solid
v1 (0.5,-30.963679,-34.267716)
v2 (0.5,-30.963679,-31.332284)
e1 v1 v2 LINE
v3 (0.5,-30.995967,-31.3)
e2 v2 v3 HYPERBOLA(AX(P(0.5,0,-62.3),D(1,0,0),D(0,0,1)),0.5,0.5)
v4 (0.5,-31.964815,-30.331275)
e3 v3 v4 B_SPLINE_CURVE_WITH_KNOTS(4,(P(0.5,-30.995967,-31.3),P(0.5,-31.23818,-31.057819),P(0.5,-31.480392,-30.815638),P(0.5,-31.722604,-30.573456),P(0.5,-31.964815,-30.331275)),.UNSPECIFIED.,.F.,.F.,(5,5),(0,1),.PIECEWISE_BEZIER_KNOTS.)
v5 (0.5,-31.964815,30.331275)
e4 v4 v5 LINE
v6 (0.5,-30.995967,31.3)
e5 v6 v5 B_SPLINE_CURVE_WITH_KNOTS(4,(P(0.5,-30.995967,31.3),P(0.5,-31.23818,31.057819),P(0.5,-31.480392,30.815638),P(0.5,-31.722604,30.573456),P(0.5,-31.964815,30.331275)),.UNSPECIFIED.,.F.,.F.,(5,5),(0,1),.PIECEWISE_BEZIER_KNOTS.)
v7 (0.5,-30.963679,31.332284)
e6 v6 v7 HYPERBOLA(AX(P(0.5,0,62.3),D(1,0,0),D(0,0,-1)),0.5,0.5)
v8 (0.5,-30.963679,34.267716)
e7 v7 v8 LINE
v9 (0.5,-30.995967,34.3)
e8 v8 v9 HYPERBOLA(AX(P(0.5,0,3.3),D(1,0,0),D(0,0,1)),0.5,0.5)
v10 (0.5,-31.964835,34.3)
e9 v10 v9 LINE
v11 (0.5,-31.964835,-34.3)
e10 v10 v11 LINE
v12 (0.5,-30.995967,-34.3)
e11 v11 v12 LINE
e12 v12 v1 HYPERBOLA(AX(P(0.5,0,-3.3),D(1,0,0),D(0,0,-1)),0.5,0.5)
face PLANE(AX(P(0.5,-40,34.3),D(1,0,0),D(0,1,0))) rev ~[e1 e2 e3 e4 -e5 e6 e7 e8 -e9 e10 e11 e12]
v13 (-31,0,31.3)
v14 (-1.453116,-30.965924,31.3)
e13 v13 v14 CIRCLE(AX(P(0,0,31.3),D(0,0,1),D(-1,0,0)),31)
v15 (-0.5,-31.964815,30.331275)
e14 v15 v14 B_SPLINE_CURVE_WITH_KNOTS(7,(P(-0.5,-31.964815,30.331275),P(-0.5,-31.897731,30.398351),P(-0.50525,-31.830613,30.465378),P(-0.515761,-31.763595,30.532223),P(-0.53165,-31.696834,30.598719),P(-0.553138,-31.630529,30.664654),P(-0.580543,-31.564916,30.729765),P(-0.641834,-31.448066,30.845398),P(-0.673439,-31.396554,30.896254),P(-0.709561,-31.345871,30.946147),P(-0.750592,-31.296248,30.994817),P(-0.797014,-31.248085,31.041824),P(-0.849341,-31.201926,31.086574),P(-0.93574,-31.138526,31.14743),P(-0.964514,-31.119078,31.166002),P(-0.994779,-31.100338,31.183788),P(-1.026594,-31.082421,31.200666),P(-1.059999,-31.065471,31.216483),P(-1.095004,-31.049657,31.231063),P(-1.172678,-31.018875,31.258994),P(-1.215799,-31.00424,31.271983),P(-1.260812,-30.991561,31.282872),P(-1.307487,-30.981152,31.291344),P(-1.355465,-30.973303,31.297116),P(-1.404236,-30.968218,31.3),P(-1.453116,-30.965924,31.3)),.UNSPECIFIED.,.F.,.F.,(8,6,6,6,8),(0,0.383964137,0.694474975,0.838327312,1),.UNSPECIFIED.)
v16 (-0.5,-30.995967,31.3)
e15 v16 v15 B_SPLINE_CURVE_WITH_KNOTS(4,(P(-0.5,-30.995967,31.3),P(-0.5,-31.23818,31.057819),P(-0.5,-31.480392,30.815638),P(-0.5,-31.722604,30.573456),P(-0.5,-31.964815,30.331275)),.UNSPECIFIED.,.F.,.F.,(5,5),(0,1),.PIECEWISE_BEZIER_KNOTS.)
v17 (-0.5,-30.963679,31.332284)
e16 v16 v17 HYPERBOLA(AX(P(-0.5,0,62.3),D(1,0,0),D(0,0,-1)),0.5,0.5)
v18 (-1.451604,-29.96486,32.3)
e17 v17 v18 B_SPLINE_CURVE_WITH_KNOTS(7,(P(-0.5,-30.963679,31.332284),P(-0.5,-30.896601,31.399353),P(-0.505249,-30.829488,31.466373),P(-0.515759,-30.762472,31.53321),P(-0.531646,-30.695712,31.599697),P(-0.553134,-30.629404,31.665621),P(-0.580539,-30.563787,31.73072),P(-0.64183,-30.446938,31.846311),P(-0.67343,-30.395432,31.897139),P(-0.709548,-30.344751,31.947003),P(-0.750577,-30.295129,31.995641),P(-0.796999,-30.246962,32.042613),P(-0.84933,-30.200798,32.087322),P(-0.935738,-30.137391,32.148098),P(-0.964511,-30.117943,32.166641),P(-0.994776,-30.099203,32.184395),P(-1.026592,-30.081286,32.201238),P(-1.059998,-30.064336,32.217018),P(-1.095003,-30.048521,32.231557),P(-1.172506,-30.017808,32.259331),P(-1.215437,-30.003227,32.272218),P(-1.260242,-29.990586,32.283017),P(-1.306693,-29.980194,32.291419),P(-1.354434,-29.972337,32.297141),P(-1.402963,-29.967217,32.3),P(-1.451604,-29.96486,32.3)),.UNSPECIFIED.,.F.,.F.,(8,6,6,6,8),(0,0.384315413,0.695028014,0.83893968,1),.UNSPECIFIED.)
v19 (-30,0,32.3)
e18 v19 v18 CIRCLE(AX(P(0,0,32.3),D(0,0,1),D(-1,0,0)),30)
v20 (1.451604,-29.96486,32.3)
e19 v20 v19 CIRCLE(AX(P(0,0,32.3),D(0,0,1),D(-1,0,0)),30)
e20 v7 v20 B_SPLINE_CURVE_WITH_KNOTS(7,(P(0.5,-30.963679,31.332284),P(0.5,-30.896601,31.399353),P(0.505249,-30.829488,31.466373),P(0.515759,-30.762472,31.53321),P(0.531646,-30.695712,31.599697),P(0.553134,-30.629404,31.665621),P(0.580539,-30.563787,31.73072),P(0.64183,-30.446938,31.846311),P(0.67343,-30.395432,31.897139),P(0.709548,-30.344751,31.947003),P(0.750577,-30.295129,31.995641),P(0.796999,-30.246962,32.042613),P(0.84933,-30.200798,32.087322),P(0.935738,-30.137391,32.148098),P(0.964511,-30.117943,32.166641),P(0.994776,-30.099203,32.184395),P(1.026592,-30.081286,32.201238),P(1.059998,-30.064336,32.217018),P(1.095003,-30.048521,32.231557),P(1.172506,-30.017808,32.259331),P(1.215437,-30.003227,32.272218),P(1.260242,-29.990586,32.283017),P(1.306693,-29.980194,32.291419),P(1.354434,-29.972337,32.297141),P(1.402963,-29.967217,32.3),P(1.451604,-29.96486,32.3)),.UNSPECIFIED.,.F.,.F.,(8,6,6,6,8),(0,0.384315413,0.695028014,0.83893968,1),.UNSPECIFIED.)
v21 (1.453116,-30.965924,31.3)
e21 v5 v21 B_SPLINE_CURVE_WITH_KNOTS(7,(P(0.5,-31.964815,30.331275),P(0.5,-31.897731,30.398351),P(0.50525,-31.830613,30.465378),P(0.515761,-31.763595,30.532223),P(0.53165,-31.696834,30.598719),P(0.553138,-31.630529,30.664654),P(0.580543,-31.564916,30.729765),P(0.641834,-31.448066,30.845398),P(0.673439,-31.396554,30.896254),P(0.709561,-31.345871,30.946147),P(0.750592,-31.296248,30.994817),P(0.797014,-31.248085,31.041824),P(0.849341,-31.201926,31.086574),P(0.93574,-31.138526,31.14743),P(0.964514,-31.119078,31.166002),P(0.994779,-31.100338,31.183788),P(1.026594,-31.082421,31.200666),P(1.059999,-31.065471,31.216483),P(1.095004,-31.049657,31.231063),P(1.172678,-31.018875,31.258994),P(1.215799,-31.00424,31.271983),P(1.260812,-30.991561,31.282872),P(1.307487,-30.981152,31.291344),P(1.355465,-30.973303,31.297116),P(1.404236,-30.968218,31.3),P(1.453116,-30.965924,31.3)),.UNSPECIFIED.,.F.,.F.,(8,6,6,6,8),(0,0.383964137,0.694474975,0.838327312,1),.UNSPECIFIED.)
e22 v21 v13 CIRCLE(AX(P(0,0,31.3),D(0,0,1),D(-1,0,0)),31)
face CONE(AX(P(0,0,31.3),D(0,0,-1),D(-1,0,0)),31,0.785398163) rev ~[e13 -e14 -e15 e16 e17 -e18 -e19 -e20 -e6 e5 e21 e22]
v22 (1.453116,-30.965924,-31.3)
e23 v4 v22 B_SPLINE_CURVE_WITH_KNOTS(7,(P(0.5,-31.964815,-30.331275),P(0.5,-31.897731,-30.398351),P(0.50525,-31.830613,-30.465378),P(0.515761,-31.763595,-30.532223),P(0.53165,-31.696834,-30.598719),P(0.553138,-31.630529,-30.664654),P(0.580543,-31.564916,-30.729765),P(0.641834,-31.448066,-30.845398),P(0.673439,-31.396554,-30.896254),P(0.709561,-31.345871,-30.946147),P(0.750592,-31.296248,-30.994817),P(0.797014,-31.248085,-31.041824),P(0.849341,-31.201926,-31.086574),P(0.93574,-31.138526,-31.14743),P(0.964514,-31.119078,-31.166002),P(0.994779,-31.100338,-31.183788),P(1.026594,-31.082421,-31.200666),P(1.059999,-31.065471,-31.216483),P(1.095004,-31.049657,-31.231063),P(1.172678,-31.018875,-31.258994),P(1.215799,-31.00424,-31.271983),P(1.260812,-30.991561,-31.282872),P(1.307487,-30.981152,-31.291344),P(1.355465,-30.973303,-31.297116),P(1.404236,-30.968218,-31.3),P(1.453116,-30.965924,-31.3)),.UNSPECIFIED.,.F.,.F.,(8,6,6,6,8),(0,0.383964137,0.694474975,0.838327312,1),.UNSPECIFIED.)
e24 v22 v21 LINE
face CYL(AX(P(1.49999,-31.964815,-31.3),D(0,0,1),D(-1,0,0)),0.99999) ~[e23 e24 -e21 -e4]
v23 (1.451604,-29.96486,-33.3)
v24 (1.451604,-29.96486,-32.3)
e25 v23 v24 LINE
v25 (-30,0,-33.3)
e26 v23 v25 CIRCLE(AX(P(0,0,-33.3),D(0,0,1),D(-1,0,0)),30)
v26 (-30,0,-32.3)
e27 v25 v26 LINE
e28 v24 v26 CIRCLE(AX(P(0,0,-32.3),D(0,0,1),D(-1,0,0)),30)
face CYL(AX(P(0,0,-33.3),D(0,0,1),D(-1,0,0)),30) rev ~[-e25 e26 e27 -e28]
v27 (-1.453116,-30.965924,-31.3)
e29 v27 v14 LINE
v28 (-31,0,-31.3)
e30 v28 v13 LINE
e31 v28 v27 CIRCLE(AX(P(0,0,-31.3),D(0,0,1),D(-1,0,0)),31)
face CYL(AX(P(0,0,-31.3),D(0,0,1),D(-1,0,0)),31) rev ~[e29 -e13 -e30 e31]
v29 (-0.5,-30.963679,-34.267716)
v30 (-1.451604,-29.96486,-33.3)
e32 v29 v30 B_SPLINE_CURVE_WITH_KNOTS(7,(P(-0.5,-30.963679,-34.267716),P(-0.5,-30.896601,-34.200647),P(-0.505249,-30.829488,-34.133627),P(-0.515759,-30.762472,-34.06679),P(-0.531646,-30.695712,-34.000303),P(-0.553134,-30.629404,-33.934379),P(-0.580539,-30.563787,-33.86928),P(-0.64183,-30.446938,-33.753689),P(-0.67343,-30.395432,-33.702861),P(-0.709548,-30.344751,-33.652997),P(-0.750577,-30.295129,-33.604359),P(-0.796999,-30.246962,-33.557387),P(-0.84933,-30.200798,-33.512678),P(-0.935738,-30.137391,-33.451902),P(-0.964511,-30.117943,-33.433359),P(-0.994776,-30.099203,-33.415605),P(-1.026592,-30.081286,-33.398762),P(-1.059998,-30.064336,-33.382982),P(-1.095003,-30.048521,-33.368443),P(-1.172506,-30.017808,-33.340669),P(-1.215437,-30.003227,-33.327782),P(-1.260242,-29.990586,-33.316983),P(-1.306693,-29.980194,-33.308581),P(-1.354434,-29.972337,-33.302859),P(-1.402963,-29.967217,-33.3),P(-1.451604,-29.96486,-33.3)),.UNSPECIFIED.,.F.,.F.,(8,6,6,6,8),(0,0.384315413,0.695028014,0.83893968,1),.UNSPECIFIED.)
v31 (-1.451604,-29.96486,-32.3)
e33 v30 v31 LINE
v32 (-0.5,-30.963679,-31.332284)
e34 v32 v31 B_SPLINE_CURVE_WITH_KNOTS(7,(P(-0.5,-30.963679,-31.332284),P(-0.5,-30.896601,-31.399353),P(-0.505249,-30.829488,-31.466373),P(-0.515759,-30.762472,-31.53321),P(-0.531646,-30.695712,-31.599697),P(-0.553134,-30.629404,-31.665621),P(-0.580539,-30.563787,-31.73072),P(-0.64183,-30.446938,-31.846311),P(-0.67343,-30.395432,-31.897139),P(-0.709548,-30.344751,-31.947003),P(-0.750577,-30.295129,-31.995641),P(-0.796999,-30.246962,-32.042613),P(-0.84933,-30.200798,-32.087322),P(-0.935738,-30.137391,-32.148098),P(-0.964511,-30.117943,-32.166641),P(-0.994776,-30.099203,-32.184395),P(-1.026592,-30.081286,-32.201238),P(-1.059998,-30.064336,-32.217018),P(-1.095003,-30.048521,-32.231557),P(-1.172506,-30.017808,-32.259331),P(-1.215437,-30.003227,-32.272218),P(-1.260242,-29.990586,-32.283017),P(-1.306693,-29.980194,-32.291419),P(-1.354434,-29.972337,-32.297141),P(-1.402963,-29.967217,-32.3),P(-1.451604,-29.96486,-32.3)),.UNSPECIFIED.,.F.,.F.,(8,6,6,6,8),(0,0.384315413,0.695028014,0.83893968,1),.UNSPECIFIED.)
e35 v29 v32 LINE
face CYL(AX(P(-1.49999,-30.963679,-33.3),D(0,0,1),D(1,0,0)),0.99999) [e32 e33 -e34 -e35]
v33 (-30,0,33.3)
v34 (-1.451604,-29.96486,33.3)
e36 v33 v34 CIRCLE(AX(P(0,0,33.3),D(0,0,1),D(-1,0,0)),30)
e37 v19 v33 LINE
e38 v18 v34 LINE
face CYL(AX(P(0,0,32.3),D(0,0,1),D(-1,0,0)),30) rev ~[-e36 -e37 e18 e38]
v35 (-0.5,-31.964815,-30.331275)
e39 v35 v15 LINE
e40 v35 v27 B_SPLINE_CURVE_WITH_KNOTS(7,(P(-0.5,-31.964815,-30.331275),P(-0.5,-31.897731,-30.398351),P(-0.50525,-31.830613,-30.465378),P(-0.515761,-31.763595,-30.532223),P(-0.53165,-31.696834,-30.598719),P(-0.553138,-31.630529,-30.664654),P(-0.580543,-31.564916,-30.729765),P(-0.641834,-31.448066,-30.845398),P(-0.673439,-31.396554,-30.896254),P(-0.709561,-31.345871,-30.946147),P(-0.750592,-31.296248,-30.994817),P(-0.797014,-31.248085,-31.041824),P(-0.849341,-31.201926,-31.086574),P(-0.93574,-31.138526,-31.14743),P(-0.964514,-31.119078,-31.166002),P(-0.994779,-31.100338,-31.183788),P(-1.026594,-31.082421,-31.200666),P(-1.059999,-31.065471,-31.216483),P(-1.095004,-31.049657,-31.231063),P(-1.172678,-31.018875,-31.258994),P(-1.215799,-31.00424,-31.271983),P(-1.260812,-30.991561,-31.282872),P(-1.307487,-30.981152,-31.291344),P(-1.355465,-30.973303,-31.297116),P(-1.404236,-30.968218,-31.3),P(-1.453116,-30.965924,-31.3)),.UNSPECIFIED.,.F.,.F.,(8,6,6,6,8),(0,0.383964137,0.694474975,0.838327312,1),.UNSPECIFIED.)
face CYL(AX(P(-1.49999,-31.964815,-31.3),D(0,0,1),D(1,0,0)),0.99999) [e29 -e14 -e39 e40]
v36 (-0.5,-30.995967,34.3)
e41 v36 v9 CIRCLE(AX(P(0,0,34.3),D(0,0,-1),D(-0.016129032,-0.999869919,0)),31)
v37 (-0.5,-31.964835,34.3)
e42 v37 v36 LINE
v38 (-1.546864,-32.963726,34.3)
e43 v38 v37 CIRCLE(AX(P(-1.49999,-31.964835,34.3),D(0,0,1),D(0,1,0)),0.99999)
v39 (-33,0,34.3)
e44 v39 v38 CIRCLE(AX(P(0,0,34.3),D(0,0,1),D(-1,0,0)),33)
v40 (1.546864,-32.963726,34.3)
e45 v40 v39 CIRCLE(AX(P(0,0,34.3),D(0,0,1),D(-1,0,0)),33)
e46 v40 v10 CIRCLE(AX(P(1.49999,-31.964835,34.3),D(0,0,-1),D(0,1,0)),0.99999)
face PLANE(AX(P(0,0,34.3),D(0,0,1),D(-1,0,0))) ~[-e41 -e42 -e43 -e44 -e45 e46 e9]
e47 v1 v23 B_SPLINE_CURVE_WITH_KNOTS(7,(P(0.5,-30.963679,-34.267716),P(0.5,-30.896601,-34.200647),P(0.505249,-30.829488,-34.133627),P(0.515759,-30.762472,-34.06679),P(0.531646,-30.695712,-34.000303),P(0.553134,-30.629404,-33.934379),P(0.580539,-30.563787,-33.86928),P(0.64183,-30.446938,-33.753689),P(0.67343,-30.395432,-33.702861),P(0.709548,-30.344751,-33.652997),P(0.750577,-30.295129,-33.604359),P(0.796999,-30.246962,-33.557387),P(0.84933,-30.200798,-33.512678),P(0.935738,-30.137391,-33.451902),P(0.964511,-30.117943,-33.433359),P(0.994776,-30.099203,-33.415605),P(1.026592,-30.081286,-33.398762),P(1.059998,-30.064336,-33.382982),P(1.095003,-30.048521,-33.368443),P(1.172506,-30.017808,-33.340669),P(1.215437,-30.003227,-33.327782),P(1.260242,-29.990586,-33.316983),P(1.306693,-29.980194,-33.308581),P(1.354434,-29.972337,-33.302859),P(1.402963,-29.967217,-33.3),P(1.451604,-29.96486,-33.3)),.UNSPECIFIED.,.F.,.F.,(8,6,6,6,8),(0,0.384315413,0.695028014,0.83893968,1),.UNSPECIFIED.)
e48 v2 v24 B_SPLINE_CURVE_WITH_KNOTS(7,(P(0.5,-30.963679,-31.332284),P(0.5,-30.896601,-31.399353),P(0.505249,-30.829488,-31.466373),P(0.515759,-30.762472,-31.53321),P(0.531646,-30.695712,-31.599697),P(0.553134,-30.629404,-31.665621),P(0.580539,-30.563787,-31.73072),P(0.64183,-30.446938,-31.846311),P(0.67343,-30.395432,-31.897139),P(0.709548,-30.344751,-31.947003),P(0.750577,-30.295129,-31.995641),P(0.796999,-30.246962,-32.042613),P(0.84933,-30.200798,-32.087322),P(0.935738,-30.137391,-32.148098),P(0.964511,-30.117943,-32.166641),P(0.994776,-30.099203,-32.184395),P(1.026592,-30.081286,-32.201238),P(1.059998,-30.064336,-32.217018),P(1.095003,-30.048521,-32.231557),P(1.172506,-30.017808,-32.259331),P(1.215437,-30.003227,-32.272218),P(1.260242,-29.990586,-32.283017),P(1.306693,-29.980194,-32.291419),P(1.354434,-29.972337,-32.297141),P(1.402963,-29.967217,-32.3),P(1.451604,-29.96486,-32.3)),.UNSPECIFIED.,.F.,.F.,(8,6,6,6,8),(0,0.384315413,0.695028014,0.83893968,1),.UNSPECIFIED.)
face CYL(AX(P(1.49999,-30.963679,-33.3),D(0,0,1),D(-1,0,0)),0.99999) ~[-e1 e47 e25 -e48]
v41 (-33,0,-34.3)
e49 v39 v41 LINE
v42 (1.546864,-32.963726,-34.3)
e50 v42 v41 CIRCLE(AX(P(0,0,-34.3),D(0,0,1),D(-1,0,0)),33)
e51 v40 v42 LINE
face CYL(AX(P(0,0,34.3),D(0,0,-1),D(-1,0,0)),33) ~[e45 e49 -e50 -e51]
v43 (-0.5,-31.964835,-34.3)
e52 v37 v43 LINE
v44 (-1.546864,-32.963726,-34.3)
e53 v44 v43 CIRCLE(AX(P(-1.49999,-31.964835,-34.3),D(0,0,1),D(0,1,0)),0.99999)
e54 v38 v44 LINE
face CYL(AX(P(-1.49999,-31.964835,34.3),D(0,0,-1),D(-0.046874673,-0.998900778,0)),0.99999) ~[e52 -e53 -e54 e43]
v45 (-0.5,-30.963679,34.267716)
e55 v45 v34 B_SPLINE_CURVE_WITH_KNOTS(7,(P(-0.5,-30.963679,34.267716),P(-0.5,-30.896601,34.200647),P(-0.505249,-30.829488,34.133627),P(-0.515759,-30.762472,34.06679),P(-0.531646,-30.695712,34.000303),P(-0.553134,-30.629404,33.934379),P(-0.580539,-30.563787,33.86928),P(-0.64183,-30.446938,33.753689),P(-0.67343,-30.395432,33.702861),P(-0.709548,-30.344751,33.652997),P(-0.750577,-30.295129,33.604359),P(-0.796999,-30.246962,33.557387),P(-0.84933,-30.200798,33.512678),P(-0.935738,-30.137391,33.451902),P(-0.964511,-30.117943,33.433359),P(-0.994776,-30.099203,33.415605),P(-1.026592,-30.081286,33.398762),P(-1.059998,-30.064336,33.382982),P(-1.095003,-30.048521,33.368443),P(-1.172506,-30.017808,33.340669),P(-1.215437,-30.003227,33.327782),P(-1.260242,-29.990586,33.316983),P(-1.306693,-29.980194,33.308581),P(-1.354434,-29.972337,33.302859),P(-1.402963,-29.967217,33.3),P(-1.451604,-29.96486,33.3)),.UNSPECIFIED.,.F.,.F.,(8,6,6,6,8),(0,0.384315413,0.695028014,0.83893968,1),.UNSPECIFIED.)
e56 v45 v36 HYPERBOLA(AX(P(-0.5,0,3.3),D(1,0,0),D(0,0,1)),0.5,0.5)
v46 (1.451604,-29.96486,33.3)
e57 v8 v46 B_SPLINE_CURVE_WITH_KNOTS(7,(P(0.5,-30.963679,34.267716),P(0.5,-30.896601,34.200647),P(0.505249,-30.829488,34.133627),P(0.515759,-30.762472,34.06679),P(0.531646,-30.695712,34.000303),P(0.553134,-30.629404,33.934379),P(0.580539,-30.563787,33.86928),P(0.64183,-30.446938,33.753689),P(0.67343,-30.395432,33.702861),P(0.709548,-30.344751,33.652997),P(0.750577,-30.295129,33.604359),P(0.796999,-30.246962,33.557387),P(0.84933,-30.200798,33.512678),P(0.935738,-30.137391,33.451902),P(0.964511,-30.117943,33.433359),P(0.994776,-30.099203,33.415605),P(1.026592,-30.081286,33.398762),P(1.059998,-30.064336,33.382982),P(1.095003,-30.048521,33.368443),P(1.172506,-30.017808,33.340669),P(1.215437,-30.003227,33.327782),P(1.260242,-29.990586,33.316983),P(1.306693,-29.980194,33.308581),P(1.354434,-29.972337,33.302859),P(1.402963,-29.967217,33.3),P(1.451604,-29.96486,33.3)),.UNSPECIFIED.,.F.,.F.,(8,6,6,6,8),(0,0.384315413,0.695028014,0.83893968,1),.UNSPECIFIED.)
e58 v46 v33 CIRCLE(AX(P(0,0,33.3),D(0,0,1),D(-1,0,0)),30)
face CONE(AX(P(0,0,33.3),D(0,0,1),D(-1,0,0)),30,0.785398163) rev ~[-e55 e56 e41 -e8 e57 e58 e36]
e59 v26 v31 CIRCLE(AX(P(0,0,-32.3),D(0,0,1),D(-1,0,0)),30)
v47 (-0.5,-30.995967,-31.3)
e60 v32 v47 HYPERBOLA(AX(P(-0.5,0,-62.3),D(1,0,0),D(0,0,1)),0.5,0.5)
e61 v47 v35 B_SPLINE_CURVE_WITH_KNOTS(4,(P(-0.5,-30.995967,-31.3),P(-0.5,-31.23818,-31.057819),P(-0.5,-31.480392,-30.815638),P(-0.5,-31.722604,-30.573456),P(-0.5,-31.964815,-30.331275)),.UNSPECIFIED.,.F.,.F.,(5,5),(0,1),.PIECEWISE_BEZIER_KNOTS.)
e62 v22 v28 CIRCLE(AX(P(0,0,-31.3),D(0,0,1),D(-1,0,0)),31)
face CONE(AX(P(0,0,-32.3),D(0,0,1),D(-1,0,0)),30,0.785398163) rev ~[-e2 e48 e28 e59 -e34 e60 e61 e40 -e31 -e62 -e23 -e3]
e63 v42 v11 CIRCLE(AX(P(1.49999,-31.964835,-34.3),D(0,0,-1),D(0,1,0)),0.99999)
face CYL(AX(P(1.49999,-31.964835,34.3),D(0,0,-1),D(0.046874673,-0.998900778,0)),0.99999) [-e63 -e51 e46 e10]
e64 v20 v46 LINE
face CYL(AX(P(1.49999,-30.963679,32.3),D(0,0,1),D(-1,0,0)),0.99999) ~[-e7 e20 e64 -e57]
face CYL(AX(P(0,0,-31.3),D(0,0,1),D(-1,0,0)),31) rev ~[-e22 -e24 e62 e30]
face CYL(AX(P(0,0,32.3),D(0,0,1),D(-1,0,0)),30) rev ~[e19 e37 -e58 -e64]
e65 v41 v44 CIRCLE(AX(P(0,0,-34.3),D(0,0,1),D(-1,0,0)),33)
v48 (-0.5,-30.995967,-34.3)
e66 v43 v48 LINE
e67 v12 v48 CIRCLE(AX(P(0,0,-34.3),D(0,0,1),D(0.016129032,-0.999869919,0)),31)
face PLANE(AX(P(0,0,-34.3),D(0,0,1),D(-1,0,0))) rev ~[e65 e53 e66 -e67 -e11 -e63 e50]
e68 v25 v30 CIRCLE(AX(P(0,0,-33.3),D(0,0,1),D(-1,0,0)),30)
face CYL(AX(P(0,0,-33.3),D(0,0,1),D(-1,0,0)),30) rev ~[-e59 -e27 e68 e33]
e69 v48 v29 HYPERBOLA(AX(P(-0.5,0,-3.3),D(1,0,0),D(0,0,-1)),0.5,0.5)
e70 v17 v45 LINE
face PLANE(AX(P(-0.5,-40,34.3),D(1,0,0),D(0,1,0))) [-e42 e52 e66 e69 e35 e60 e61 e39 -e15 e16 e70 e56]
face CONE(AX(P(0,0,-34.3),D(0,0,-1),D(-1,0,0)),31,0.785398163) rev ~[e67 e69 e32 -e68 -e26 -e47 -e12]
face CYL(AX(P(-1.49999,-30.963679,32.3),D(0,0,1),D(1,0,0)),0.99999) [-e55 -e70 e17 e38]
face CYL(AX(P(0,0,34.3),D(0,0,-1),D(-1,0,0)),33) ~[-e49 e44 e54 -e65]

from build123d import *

# Parameters (mm, degrees)
F2_W     = 1
F2_H     = 40
F3_DEPTH = 68.601
F4_R     = 0.99999


# Not quite as in the source:
# - a fillet or chamfer is up to 0.001 mm smaller than in the source, because OpenCascade refuses the exact size


with BuildPart() as f1:
    # F0 (on Front) → F1 (revolve)
    with BuildSketch(Plane.XZ):
        Polygon((-33, 34.3), (-33, 0), (-31, 0), (-31, 31.3), (-30, 32.3), (-30, 33.3), (-31, 34.3), align=None)
        Polygon((-31, 0), (-33, 0), (-33, -34.3), (-31, -34.3), (-30, -33.3), (-30, -32.3), (-31, -31.3), align=None)
    revolve(axis=Axis((0, 0, 17.15), (0, 0, 1)))

    # F2 (on face) → F3 (cut, through all)
    with BuildSketch(Plane.XY.offset(34.3)):
        with Locations((0, -20)):
            Rectangle(F2_W, F2_H)
    extrude(amount=-F3_DEPTH, mode=Mode.SUBTRACT)

    # F4 (radius 1 in the source; OpenCascade refuses exactly that, so slightly less here)
    f4_edges = [f1.edges().sort_by_distance(p)[0] for p in [
        (-0.5, -32.996212, 0),
        (-0.5, -30.995967, 0),
        (-0.5, -29.995833, 32.8),
        (-0.5, -29.995833, -32.8),
        (0.5, -29.995833, -32.8),
        (0.5, -30.995967, 0),
        (0.5, -29.995833, 32.8),
        (0.5, -32.996212, 0),
    ]]
    fillet(f4_edges, radius=F4_R)


solid = f1.part
